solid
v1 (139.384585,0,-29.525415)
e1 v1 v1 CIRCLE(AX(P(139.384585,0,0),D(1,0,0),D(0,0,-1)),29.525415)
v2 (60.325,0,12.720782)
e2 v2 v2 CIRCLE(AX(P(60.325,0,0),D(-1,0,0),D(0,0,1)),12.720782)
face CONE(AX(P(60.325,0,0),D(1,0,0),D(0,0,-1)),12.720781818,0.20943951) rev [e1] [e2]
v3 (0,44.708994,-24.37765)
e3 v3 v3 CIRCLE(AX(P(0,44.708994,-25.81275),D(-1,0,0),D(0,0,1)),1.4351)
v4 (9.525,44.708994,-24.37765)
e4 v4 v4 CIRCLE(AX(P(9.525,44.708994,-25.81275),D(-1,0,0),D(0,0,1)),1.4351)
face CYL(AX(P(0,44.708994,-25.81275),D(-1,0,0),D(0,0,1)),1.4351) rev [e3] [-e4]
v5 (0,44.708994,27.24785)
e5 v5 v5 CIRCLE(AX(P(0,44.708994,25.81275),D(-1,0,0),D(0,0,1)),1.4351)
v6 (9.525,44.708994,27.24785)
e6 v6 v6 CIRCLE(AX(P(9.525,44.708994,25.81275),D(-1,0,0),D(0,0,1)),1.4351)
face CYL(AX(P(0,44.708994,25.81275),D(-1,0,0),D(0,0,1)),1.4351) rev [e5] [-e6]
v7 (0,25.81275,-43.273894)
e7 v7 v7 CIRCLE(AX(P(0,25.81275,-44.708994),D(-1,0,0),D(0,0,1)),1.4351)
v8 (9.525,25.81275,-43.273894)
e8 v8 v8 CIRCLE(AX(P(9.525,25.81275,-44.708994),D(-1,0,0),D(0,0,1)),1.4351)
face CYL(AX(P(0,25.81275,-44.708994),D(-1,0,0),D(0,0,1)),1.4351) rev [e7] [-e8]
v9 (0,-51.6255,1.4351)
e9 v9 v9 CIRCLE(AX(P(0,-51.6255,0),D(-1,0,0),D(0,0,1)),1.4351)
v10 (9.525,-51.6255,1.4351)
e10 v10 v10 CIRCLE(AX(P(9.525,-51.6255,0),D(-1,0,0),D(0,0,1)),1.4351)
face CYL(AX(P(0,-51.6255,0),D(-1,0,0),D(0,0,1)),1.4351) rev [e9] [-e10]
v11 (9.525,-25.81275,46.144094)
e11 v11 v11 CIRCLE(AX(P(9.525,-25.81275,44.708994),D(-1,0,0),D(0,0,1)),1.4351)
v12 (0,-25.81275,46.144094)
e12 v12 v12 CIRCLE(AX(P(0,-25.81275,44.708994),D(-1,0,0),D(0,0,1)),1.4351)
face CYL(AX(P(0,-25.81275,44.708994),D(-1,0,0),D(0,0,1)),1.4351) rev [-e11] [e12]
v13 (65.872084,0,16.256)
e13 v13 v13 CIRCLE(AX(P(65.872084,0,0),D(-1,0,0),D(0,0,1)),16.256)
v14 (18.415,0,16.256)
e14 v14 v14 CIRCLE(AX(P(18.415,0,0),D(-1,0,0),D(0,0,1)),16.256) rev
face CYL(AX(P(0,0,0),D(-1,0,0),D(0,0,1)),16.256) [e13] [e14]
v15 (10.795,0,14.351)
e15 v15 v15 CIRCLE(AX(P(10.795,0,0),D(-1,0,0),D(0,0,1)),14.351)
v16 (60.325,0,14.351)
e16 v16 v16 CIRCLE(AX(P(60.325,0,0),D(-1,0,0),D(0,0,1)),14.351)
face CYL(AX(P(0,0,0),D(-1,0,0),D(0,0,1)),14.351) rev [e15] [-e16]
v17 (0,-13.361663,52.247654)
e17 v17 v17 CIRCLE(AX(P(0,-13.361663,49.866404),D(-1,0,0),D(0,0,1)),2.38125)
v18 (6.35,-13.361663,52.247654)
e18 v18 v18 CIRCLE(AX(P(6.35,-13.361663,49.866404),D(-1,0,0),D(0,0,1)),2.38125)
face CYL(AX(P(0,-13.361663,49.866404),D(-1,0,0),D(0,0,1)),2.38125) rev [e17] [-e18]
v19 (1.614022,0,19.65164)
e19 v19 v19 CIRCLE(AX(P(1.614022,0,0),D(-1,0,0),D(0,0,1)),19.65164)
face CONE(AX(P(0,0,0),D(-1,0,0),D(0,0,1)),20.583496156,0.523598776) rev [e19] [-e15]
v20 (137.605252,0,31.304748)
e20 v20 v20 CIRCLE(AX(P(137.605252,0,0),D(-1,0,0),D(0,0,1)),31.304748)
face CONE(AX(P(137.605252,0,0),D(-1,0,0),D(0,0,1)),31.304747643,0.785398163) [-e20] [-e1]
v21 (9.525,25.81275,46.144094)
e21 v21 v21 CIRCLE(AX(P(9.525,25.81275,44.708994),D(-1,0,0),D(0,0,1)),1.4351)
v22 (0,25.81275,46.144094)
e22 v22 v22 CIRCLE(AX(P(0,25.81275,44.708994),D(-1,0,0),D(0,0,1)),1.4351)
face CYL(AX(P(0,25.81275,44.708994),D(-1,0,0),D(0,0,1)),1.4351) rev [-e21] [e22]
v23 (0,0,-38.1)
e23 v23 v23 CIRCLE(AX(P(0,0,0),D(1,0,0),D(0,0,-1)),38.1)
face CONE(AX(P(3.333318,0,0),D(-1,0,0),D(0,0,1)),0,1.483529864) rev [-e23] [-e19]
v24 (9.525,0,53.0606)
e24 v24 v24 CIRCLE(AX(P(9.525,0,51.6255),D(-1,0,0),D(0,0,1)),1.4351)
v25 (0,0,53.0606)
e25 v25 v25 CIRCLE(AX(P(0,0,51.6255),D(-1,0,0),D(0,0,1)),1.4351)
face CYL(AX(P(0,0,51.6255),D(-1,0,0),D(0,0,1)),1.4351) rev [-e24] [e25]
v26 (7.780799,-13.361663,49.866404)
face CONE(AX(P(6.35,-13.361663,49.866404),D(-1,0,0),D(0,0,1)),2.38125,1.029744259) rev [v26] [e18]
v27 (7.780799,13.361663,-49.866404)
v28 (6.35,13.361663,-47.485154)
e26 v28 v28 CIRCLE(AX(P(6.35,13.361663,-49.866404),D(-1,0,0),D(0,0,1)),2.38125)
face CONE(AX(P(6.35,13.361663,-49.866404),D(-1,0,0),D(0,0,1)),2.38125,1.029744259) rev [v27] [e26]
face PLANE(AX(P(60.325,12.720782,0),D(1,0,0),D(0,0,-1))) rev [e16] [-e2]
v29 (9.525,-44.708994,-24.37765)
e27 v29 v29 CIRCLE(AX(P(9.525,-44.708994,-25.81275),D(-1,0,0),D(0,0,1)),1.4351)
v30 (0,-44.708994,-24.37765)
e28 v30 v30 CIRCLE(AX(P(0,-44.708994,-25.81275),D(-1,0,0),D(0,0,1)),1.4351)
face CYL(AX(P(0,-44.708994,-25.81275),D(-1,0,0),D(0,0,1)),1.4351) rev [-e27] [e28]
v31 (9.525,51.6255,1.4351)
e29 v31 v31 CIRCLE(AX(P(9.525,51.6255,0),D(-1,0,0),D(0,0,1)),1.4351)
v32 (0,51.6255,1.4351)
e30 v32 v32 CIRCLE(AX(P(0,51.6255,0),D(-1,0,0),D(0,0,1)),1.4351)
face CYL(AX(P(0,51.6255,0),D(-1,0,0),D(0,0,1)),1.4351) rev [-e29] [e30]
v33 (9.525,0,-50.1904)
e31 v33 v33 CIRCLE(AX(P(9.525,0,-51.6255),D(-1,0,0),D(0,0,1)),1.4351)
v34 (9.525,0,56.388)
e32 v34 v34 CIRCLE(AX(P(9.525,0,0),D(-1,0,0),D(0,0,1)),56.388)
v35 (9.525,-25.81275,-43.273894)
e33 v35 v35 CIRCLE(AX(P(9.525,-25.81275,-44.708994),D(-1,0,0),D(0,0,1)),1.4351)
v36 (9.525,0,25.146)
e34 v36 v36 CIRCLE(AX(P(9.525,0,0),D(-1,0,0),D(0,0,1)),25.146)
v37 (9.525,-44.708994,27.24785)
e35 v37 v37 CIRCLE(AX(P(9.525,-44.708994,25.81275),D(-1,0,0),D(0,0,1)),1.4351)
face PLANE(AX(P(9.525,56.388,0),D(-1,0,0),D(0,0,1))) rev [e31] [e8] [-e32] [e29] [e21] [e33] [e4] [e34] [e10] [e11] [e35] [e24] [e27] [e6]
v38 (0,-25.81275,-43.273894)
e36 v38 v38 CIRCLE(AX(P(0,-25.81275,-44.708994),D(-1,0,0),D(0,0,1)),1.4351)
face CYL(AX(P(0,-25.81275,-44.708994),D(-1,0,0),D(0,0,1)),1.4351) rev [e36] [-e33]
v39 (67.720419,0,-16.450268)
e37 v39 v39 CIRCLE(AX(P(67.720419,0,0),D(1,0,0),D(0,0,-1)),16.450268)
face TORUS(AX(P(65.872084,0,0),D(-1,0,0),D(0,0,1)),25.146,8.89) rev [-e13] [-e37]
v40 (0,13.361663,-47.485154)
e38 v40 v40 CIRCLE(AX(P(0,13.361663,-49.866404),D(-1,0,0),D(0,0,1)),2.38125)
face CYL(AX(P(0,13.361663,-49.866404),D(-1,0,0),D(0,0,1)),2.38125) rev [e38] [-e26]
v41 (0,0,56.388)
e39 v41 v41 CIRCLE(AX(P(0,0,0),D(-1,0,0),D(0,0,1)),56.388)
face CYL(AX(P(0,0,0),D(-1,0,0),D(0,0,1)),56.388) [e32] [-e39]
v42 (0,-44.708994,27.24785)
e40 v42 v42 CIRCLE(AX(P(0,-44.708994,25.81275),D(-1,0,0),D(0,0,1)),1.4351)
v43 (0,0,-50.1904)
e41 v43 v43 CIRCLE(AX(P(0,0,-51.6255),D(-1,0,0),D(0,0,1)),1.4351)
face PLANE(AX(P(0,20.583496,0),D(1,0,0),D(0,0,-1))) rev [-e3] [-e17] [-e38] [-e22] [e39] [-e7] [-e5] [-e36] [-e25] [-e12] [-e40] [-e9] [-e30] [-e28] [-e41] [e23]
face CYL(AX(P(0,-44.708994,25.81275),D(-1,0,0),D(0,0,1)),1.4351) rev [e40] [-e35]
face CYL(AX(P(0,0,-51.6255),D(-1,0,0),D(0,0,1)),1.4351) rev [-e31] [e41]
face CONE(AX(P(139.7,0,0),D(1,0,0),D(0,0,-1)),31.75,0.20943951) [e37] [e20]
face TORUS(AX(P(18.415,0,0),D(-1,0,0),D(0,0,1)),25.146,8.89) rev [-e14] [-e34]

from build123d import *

# Parameters (mm, degrees)
FLANGE_HOLES_D    = 2.8702
DOWEL_HOLES_D     = 4.7625
DOWEL_HOLES_DEPTH = 6.35
DOWEL_HOLES_TIP   = 1.430799349
FILLET1_R         = 8.89
CHAMFER1_SIZE     = 2.141545552
CHAMFER1_SIZE_2   = 2.54


with BuildPart() as part:
    # Sketch2 → Main Structure (revolve)
    with BuildSketch(Plane.XY, mode=Mode.PRIVATE) as main_structure_sk:
        Polygon((0, 20.583496156), (0, 56.388), (9.525, 56.388), (9.525, 16.256), (66.806461084, 16.256), (139.7, 31.75), (139.7, 29.592458901), (60.325, 12.720781818), (60.325, 14.351), (10.795, 14.351), align=None)
    revolve(main_structure_sk.sketch.rotate(Axis((0, 0, 0), (1, 0, 0)), 90), axis=Axis((0, 0, 0), (1, 0, 0)))

    # Flange Holes (through all)
    with Locations(Plane.ZY):
        with Locations((0, -51.6255), (-25.81275, -44.708994483), (-44.708994483, -25.81275), (-51.6255, 0), (-44.708994483, 25.81275), (-25.81275, 44.708994483), (0, 51.6255), (25.81275, 44.708994483), (44.708994483, 25.81275), (51.6255, 0), (44.708994483, -25.81275), (25.81275, -44.708994483)):
            Hole(FLANGE_HOLES_D / 2)

    # Dowel Holes
    with Locations(Plane.ZY):
        with Locations((49.866403745, -13.361662613), (-49.866403745, 13.361662613)):
            Hole(DOWEL_HOLES_D / 2, depth=DOWEL_HOLES_DEPTH)
            with Locations((0, 0, -(DOWEL_HOLES_DEPTH + DOWEL_HOLES_TIP / 2))):  # 118° drill point
                Cone(0, DOWEL_HOLES_D / 2, DOWEL_HOLES_TIP, mode=Mode.SUBTRACT)

    # Fillet1
    fillet1_edges = [part.edges().sort_by_distance(p)[0] for p in [
        (66.806461084, 0, -16.256),
        (9.525, 0, -16.256),
    ]]
    fillet(fillet1_edges, radius=FILLET1_R)

    # Sketch13 → Cut-Revolve1 (revolve, cut)
    with BuildSketch(Plane(origin=(0, 0, 0), x_dir=(1, 0, 0), z_dir=(0, 1, 0)), mode=Mode.PRIVATE) as cut_revolve1_sk:
        Polygon((0, 38.1), (3.33331808, 0), (0, 0), align=None)
    revolve(cut_revolve1_sk.sketch.rotate(Axis((3.33331808, 0, 0), (-1, 0, 0)), 180), axis=Axis((3.33331808, 0, 0), (-1, 0, 0)), mode=Mode.SUBTRACT)

    # Chamfer1
    # the kernel refuses this chamfer: 3.297690964, 2.54, 2.141545552 mm, written as the material it takes off along each edge
    with BuildSketch(Plane(origin=(139.7, 0, 0), x_dir=(0, 0, 1), z_dir=(0, 1, 0))) as chamfer1_piece_1:
        Polygon((31.75 - CHAMFER1_SIZE * 0.207911690799, -CHAMFER1_SIZE * 0.978147600645), (31.75 - CHAMFER1_SIZE_2, 0), (31.75, 0), align=None)
    revolve(axis=Axis((139.7, 0, 0), (1, 0, 0)), mode=Mode.SUBTRACT)


solid = part.part
